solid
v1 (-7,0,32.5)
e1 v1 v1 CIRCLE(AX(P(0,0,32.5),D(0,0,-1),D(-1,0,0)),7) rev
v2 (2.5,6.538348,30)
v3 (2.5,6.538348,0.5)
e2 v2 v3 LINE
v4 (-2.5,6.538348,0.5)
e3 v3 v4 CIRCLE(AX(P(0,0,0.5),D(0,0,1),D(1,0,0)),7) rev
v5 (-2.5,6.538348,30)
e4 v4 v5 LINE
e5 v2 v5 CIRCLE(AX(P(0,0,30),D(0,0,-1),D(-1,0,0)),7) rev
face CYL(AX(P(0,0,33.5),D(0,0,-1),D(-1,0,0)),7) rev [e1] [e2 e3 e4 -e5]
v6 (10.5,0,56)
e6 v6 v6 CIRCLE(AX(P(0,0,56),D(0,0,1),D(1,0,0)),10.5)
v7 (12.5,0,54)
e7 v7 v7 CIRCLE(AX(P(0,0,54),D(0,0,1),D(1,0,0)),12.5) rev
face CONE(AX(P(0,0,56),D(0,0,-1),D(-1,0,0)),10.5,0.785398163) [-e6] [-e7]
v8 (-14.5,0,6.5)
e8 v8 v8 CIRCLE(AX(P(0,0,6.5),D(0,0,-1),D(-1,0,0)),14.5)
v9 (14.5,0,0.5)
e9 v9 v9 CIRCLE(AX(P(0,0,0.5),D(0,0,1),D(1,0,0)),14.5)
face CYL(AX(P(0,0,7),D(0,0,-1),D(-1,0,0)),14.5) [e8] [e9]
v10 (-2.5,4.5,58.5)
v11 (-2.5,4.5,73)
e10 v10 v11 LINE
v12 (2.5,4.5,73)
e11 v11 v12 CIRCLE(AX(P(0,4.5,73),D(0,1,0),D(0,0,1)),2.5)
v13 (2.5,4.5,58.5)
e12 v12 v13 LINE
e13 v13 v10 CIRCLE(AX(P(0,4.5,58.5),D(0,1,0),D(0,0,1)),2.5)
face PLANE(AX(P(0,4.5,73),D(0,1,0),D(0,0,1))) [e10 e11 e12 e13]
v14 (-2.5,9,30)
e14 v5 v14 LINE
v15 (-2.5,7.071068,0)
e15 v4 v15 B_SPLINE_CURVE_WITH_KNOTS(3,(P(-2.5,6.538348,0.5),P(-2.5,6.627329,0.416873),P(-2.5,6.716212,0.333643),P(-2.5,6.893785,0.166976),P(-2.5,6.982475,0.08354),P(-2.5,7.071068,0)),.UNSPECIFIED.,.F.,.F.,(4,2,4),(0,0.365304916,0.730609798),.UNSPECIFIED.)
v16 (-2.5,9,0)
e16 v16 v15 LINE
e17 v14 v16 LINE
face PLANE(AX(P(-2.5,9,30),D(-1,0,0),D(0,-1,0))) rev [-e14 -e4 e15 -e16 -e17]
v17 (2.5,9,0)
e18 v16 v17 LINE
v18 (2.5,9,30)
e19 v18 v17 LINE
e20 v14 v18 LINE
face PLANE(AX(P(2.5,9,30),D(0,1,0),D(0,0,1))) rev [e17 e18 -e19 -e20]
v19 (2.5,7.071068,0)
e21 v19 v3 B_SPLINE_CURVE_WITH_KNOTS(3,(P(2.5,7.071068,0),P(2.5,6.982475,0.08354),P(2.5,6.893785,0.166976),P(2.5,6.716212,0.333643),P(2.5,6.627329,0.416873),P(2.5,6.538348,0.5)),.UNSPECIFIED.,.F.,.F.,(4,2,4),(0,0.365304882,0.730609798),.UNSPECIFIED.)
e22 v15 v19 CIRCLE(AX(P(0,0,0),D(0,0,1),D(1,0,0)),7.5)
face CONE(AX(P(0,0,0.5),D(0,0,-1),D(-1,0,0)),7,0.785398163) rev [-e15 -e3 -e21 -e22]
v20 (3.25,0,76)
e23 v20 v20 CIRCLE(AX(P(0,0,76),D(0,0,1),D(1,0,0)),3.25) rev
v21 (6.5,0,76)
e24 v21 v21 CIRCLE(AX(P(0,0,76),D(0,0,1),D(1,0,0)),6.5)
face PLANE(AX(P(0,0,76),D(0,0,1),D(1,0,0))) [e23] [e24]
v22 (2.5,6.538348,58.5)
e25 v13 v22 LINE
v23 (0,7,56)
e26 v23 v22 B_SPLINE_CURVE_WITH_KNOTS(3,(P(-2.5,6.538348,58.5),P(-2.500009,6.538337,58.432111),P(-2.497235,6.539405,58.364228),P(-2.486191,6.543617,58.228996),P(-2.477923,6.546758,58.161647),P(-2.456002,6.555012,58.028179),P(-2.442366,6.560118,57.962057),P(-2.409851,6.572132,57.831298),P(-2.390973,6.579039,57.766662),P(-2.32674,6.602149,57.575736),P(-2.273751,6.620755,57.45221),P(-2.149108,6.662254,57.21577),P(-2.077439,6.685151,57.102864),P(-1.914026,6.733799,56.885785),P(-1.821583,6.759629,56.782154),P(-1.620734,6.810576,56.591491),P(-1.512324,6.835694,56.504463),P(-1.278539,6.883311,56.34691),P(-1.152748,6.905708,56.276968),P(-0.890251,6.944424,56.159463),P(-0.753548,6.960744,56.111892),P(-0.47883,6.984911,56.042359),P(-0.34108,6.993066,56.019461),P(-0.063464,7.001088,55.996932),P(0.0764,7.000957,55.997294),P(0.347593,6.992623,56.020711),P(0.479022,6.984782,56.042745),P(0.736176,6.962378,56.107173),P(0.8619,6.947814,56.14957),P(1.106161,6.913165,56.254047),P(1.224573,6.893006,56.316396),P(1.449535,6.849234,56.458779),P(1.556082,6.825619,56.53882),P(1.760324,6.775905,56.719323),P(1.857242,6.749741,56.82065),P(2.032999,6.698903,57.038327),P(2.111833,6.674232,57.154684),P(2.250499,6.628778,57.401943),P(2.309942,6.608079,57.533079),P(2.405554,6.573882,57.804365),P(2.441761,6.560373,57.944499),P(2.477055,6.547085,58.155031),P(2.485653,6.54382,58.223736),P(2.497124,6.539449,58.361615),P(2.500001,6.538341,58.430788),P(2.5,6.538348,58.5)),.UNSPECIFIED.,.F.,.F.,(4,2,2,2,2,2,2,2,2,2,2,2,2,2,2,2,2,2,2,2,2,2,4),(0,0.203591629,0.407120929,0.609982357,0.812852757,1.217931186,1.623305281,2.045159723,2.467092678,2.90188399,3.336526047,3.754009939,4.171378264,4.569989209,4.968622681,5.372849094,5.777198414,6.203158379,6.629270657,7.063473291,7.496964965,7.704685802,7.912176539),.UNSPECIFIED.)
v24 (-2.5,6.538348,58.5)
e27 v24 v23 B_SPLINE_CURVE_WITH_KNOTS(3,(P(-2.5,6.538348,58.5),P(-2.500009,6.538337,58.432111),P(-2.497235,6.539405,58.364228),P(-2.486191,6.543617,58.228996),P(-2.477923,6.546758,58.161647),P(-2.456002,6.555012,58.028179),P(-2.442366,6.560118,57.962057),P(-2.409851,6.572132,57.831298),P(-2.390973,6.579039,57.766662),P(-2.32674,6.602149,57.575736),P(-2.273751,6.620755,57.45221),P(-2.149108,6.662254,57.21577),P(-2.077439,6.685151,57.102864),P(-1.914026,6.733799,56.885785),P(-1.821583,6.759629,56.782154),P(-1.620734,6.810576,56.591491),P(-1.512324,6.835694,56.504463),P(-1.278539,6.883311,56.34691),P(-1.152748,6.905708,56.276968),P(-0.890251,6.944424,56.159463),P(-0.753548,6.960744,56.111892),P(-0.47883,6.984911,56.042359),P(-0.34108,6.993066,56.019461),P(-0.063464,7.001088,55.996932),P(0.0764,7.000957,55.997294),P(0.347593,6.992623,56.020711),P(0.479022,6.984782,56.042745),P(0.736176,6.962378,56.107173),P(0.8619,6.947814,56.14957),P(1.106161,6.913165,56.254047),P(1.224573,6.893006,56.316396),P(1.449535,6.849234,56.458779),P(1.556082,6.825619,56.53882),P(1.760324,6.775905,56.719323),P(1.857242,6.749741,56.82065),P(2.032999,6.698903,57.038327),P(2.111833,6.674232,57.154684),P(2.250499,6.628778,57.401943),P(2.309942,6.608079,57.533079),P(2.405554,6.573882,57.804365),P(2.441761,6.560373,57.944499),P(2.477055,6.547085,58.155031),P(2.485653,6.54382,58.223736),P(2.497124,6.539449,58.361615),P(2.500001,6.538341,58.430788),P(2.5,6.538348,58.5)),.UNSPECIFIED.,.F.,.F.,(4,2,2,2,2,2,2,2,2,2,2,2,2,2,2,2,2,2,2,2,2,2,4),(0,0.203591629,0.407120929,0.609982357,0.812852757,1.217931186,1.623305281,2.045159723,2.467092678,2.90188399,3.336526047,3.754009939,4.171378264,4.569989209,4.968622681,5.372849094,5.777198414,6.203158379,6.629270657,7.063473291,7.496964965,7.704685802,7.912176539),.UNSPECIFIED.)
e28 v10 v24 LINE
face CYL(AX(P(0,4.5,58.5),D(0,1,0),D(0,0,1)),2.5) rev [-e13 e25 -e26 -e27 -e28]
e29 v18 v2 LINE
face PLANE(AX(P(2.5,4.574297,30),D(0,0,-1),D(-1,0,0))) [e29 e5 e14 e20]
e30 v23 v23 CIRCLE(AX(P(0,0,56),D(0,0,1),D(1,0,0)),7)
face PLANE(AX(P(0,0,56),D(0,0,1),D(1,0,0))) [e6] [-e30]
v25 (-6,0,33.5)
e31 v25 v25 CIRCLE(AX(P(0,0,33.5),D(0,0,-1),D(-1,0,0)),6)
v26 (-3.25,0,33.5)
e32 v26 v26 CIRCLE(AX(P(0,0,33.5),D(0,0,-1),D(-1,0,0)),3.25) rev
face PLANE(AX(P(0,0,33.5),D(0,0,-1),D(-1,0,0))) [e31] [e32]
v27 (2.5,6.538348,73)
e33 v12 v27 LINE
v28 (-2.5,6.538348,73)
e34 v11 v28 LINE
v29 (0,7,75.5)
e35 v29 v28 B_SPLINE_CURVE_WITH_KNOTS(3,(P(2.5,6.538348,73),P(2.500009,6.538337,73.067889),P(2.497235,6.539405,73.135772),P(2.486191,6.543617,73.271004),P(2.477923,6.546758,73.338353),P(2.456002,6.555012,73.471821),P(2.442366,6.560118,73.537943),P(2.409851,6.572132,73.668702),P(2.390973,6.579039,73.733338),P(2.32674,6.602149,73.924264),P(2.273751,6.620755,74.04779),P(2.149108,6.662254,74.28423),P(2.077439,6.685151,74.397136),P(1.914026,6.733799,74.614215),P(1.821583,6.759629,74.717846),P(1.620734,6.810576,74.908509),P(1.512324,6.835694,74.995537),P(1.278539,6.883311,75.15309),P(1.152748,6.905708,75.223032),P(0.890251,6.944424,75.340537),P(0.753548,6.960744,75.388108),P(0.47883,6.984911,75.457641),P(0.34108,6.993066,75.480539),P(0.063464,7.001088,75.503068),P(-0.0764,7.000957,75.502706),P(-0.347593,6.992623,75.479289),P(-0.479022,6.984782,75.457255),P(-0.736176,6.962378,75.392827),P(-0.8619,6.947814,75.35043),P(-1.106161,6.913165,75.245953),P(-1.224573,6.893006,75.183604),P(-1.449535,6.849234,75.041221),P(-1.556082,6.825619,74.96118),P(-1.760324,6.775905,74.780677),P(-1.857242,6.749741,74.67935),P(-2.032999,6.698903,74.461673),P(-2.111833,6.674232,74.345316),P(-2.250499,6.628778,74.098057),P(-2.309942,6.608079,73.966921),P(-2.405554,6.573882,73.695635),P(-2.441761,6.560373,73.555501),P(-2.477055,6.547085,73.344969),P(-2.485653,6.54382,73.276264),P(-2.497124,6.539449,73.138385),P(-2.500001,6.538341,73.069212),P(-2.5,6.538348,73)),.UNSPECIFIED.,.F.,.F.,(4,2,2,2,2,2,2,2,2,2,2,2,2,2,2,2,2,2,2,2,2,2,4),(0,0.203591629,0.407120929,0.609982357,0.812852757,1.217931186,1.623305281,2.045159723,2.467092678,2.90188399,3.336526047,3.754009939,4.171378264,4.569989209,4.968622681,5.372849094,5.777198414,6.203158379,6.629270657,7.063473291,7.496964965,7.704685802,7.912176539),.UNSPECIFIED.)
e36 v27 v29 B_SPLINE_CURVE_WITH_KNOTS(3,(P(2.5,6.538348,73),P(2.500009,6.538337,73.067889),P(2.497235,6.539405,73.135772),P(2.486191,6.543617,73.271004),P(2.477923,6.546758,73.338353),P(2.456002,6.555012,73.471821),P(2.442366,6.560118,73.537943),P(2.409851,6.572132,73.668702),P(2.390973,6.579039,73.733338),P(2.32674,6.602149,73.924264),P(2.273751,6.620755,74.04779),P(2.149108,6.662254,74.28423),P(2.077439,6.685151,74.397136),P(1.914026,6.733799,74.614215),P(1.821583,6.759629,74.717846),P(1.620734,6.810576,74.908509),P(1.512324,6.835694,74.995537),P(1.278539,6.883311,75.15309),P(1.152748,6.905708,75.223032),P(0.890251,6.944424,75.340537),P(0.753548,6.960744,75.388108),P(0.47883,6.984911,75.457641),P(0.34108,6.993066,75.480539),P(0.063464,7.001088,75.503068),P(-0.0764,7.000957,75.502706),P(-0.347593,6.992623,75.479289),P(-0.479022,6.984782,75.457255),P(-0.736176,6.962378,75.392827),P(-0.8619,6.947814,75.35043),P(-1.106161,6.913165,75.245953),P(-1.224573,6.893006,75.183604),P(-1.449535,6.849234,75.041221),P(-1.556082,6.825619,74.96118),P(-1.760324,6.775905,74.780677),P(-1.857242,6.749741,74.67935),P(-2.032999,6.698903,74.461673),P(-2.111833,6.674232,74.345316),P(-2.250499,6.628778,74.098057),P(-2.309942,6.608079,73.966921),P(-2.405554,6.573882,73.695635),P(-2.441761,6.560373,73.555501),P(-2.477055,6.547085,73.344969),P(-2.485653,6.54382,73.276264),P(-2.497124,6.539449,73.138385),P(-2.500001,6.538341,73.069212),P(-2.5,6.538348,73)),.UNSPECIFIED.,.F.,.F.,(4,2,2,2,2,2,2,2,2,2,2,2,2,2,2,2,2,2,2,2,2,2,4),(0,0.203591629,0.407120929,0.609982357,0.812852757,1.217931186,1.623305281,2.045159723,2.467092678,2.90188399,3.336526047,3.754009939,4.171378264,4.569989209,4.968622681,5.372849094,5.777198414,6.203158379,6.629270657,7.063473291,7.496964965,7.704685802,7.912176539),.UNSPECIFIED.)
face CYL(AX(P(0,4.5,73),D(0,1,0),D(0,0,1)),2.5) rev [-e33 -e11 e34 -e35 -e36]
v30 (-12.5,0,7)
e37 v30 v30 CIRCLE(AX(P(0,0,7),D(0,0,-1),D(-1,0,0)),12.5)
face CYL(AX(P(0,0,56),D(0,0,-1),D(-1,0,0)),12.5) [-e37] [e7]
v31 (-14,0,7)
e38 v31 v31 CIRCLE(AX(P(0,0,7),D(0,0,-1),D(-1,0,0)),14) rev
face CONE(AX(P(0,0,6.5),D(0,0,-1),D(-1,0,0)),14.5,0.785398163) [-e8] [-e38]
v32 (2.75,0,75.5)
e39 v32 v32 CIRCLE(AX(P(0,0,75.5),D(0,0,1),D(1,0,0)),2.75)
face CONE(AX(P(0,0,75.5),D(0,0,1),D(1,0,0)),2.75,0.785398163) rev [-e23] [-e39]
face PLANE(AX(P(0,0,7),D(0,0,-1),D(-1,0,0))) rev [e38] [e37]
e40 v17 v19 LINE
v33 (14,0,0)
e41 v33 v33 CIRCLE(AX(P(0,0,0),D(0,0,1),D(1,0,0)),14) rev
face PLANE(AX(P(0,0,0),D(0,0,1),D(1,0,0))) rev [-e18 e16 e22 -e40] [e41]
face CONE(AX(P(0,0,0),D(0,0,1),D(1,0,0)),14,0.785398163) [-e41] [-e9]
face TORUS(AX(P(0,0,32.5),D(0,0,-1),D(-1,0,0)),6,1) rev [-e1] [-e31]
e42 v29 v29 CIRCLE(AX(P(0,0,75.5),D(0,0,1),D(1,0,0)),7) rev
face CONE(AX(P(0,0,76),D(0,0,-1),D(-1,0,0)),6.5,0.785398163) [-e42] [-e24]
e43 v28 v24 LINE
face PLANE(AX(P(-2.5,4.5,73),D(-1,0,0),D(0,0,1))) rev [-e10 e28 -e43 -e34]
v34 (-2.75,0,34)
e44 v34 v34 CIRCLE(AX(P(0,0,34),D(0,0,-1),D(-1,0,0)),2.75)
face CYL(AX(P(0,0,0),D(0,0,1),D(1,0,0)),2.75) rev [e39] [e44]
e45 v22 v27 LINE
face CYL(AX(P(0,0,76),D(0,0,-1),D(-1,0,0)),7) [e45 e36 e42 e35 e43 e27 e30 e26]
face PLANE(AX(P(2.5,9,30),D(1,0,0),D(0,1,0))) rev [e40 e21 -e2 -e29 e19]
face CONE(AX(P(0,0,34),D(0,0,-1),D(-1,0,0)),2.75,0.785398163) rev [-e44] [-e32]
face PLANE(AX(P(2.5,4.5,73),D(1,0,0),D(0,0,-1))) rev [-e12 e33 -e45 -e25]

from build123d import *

# Parameters (mm, degrees)
SKETCH_1_R          = 12.5
EXTRUDE_1_DEPTH     = 56
SKETCH_4_R          = 7
EXTRUDE_2_DEPTH     = 3
SKETCH_7_R          = 7
EXTRUDE_3_DEPTH     = 20
CHAMFER_1_SIZE      = 2
SKETCH_8_R          = 7
CUT_EXTRUDE_3_DEPTH = 33.5
SKETCH_9_R          = 14.5
SKETCH_9_R_2        = 12.5
EXTRUDE_4_DEPTH     = 7
SKETCH_10_R         = 2.75
CUT_EXTRUDE_4_DEPTH = 79.71785058
CUT_EXTRUDE_5_DEPTH = 2.5
SKETCH_12_W         = 5
SKETCH_12_H         = 4.425702811
CUT_EXTRUDE_6_DEPTH = 30
CHAMFER_2_SIZE      = 0.5
CHAMFER_3_SIZE      = 0.5
CHAMFER_4_SIZE      = 0.5
CHAMFER_5_SIZE      = 0.5
FILLET_1_R          = 1


with BuildPart() as part:
    # 草图1 → 拉伸1 (new body)
    with BuildSketch(Plane.XY):
        Circle(SKETCH_1_R)
    extrude(amount=EXTRUDE_1_DEPTH)

    # 草图4 → 拉伸2 (add)
    with BuildSketch(Plane.XY.offset(56)):
        Circle(SKETCH_4_R)
    extrude(amount=-EXTRUDE_2_DEPTH)

    # 草图7 → 拉伸3 (add)
    with BuildSketch(Plane.XY.offset(56)):
        Circle(SKETCH_7_R)
    extrude(amount=EXTRUDE_3_DEPTH)

    # 倒角1
    chamfer_1_edges = [part.edges().sort_by_distance(p)[0] for p in [
        (-12.5, 0, 56),
    ]]
    chamfer(chamfer_1_edges, length=CHAMFER_1_SIZE)

    # 草图8 → 切除-拉伸3 (cut)
    with BuildSketch(Plane(origin=(0, 0, 0), x_dir=(-1, 0, 0), z_dir=(0, 0, -1))):
        with Locations(Location((0, 0, 0), (0, 0, 180))):
            Circle(SKETCH_8_R)
    extrude(amount=-CUT_EXTRUDE_3_DEPTH, mode=Mode.SUBTRACT)

    # 草图9 → 拉伸4 (add)
    with BuildSketch(Plane(origin=(0, 0, 0), x_dir=(-1, 0, 0), z_dir=(0, 0, -1))):
        Circle(SKETCH_9_R)
        Circle(SKETCH_9_R_2, mode=Mode.SUBTRACT)
    extrude(amount=-EXTRUDE_4_DEPTH)

    # 草图10 → 切除-拉伸4 (cut, through all)
    with BuildSketch(Plane.XY.offset(76)):
        Circle(SKETCH_10_R)
    extrude(amount=-CUT_EXTRUDE_4_DEPTH, mode=Mode.SUBTRACT)

    # 草图11 → 切除-拉伸5 (cut)
    with BuildSketch(Plane(origin=(0, 7, 0), x_dir=(-1, 0, 0), z_dir=(0, 1, 0))):
        with BuildLine():
            Line((-2.5, 73), (-2.5, 58.5))
            ThreePointArc((-2.5, 58.5), (0, 56), (2.5, 58.5))
            Line((2.5, 58.5), (2.5, 73))
            ThreePointArc((2.5, 73), (0, 75.5), (-2.5, 73))
        make_face()
    extrude(amount=-CUT_EXTRUDE_5_DEPTH, mode=Mode.SUBTRACT)

    # 草图12 → 切除-拉伸6 (cut)
    with BuildSketch(Plane(origin=(0, 0, 0), x_dir=(-1, 0, 0), z_dir=(0, 0, -1))):
        with Locations((0, 6.787148594)):
            Rectangle(SKETCH_12_W, SKETCH_12_H)
    extrude(amount=-CUT_EXTRUDE_6_DEPTH, mode=Mode.SUBTRACT)

    # 倒角2
    chamfer_2_edges = [part.edges().sort_by_distance(p)[0] for p in [
        (14.5, 0, 7),
        (14.5, 0, 0),
        (-3.968626967, -5.766281297, 0),
    ]]
    chamfer(chamfer_2_edges, length=CHAMFER_2_SIZE)

    # 倒角3
    chamfer_3_edges = [part.edges().sort_by_distance(p)[0] for p in [
        (-7, 0, 76),
    ]]
    chamfer(chamfer_3_edges, length=CHAMFER_3_SIZE - 0.0001)  # a hair under: the kernel refuses the full size

    # 倒角4
    chamfer_4_edges = [part.edges().sort_by_distance(p)[0] for p in [
        (-2.75, 0, 76),
    ]]
    chamfer(chamfer_4_edges, length=CHAMFER_4_SIZE)

    # 倒角5
    chamfer_5_edges = [part.edges().sort_by_distance(p)[0] for p in [
        (-2.75, 0, 33.5),
    ]]
    chamfer(chamfer_5_edges, length=CHAMFER_5_SIZE)

    # 圆角1
    fillet_1_edges = [part.edges().sort_by_distance(p)[0] for p in [
        (-7, 0, 33.5),
    ]]
    fillet(fillet_1_edges, radius=FILLET_1_R)


solid = part.part
